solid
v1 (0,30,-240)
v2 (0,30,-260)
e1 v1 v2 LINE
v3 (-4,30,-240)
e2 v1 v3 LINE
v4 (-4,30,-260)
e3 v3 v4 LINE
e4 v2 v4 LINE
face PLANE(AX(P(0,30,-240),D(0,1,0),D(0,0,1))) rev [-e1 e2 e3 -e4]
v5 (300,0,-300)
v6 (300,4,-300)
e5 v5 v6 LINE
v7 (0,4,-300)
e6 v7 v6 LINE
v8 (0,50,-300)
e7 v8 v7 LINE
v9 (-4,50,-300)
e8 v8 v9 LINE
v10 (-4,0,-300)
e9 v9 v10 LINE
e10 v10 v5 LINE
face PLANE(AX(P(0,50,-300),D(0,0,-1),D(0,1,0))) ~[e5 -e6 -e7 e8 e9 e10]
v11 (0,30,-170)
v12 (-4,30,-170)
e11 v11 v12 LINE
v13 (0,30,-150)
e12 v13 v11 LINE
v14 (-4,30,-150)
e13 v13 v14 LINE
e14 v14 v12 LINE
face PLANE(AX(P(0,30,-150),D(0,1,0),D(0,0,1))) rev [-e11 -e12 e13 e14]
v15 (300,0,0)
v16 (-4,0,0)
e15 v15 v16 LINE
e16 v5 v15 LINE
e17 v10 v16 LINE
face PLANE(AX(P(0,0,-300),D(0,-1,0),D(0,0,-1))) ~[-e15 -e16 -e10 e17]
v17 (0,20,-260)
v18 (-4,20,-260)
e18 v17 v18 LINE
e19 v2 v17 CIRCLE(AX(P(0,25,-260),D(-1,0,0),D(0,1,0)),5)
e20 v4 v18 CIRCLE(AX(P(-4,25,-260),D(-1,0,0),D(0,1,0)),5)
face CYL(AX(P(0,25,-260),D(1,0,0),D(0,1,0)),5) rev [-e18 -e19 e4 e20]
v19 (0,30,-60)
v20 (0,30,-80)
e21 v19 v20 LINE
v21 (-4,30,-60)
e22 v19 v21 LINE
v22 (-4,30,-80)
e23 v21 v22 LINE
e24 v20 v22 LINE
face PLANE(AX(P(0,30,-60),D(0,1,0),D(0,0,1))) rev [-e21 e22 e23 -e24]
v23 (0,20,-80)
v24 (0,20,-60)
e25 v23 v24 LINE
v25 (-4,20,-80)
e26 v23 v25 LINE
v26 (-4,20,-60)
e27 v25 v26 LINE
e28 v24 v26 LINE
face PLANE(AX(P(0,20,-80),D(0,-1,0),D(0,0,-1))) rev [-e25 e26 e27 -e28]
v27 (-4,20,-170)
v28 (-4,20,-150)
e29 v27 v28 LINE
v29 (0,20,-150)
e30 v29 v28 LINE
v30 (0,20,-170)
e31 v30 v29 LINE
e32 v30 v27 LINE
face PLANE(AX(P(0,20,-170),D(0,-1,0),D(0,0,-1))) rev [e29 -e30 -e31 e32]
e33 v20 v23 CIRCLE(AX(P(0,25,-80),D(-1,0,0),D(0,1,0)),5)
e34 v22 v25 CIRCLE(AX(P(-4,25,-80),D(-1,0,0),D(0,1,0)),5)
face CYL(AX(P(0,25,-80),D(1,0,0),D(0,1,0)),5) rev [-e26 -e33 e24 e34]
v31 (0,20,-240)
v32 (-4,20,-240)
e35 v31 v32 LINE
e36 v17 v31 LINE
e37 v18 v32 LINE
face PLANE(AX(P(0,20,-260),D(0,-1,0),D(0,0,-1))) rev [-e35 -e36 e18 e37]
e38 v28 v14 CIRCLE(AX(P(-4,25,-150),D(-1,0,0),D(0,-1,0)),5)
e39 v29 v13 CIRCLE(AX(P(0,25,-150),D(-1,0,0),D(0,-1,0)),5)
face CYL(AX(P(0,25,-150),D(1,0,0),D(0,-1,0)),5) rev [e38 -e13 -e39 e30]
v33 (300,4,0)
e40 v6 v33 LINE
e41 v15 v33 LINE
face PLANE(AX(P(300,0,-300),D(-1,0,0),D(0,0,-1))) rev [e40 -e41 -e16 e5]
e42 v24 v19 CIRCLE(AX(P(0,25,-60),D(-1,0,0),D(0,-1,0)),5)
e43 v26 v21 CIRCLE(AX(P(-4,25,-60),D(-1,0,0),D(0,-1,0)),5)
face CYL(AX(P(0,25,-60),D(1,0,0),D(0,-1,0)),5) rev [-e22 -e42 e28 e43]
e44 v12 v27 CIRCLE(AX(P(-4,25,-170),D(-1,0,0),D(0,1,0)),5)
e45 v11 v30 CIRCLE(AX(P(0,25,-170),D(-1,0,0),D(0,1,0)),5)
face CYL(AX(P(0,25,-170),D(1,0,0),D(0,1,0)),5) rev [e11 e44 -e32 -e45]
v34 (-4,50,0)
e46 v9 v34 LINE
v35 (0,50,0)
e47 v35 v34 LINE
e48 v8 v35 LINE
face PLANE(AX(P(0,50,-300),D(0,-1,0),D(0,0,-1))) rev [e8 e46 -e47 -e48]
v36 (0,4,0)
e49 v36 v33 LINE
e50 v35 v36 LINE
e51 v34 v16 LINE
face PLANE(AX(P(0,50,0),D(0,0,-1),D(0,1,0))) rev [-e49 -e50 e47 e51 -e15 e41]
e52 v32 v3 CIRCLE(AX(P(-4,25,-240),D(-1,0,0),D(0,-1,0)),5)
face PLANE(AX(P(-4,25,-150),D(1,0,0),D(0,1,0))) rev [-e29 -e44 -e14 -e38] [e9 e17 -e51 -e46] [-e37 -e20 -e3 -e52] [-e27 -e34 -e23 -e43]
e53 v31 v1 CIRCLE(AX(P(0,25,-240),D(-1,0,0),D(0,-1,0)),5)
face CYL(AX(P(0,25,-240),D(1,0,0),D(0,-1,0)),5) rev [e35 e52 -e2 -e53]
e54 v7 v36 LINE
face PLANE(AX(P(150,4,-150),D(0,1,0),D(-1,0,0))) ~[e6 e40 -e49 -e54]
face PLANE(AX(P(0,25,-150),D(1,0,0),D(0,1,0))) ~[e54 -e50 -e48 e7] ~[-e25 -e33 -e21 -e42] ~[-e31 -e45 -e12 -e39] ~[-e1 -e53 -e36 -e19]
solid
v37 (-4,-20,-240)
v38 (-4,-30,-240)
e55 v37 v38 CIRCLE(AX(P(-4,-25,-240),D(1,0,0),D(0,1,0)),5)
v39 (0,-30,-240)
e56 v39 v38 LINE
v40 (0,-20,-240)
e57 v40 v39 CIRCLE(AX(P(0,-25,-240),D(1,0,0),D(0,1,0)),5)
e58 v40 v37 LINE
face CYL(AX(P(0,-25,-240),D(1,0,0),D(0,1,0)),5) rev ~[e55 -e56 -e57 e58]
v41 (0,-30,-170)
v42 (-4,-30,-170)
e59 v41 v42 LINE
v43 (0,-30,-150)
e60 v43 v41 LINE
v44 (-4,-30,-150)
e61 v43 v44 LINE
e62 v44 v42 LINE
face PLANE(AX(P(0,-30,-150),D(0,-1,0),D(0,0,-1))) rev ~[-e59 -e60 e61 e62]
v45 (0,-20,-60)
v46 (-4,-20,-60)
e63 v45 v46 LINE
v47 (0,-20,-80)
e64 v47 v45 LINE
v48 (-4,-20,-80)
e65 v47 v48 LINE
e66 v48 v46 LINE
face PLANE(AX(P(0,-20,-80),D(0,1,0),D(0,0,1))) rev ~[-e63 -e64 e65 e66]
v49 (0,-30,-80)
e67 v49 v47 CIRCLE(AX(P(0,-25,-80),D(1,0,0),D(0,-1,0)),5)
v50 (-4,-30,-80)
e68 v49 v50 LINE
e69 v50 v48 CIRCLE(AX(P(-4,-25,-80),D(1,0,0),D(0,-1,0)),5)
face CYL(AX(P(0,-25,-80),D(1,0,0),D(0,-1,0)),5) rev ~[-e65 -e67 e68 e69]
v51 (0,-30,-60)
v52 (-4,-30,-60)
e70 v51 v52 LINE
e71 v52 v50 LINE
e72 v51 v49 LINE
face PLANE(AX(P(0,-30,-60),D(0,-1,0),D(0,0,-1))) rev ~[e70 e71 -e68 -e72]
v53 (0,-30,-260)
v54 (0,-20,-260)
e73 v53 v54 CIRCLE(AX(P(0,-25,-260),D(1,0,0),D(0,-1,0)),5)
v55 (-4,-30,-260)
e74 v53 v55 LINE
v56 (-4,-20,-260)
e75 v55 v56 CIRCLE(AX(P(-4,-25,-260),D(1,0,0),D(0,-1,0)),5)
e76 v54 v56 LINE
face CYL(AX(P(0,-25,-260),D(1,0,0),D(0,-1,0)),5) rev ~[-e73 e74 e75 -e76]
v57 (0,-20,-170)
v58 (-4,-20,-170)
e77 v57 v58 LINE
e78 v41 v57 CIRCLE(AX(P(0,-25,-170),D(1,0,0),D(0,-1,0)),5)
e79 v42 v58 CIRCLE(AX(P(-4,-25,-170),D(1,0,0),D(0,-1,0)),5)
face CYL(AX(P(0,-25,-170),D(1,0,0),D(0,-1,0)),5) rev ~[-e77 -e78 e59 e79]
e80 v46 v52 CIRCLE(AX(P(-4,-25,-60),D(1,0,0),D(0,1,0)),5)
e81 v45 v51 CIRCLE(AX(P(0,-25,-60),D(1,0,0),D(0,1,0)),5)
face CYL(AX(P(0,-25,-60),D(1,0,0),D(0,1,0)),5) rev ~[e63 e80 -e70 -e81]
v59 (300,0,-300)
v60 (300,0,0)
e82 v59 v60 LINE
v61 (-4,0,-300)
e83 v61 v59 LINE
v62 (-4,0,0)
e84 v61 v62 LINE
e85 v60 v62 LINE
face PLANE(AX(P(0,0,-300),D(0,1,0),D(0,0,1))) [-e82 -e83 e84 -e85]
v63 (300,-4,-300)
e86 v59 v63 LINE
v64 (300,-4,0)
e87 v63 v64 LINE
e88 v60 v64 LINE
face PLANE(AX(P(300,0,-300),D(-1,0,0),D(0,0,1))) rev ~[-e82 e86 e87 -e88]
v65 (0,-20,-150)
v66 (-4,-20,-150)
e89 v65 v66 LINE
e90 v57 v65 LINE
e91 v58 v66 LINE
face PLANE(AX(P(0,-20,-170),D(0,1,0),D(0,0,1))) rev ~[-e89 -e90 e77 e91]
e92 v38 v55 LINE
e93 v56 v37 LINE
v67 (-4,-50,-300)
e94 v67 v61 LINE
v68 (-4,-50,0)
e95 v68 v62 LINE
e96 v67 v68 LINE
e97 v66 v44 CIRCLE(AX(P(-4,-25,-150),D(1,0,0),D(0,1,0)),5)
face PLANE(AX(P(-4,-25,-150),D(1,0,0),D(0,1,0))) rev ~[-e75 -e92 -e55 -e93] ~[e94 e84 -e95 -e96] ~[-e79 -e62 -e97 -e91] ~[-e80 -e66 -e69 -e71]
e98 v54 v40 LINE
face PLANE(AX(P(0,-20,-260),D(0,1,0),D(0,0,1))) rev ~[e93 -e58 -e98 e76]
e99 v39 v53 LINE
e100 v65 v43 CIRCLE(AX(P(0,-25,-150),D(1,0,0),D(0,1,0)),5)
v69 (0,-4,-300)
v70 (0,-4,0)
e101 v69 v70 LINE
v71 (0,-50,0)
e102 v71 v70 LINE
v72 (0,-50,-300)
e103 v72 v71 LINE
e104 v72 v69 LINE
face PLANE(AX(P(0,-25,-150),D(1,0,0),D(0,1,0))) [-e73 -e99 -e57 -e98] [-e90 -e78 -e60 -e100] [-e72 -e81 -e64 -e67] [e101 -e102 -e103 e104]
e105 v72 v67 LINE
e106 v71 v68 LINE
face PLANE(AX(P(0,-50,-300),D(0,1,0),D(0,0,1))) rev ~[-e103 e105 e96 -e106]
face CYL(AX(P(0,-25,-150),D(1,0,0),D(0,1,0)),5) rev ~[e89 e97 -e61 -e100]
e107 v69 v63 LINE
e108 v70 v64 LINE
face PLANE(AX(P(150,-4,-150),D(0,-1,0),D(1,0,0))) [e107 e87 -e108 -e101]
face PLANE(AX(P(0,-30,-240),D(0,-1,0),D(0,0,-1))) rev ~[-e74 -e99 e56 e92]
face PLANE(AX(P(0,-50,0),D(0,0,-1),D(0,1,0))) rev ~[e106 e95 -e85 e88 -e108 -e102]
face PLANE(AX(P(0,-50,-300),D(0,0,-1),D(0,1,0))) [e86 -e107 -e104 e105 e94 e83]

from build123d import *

# Parameters (mm, degrees)
F0_W     = 300
F0_H     = 300
F1_DEPTH = 4
F2_W     = 50
F2_H     = 300
F3_DEPTH = 4
F5_DEPTH = 25


# Not quite as in the source:
# - the program builds the solid bodies; features that only make, move or delete a surface that nothing else refers to are left out


with BuildPart() as f1:
    # F0 (on Front) → F1 (new body)
    with BuildSketch(Plane.XZ):
        with Locations((150, -150)):
            Rectangle(F0_W, F0_H)
    extrude(amount=F1_DEPTH)

    # F2 (on Right) → F3 (join)
    with BuildSketch(Plane.YZ):
        with Locations((-25, -150)):
            Rectangle(F2_W, F2_H)
    extrude(amount=-F3_DEPTH)

    # F4 (on face) → F5 (cut)
    with BuildSketch(Plane.YZ):
        with BuildLine():
            Line((-20, -80), (-20, -60))
            ThreePointArc((-20, -60), (-25, -55), (-30, -60))
            Line((-30, -60), (-30, -80))
            ThreePointArc((-30, -80), (-25, -85), (-20, -80))
        make_face()
        with BuildLine():
            Line((-20, -170), (-20, -150))
            ThreePointArc((-20, -150), (-25, -145), (-30, -150))
            Line((-30, -150), (-30, -170))
            ThreePointArc((-30, -170), (-25, -175), (-20, -170))
        make_face()
        with BuildLine():
            Line((-20, -260), (-20, -240))
            ThreePointArc((-20, -240), (-25, -235), (-30, -240))
            Line((-30, -240), (-30, -260))
            ThreePointArc((-30, -260), (-25, -265), (-20, -260))
        make_face()
    extrude(amount=-F5_DEPTH, mode=Mode.SUBTRACT)


with BuildPart() as f8_1:
    # F8: instance of F1
    add(f1.part.mirror(Plane.XZ))


solid = Compound([f1.part, f8_1.part])
